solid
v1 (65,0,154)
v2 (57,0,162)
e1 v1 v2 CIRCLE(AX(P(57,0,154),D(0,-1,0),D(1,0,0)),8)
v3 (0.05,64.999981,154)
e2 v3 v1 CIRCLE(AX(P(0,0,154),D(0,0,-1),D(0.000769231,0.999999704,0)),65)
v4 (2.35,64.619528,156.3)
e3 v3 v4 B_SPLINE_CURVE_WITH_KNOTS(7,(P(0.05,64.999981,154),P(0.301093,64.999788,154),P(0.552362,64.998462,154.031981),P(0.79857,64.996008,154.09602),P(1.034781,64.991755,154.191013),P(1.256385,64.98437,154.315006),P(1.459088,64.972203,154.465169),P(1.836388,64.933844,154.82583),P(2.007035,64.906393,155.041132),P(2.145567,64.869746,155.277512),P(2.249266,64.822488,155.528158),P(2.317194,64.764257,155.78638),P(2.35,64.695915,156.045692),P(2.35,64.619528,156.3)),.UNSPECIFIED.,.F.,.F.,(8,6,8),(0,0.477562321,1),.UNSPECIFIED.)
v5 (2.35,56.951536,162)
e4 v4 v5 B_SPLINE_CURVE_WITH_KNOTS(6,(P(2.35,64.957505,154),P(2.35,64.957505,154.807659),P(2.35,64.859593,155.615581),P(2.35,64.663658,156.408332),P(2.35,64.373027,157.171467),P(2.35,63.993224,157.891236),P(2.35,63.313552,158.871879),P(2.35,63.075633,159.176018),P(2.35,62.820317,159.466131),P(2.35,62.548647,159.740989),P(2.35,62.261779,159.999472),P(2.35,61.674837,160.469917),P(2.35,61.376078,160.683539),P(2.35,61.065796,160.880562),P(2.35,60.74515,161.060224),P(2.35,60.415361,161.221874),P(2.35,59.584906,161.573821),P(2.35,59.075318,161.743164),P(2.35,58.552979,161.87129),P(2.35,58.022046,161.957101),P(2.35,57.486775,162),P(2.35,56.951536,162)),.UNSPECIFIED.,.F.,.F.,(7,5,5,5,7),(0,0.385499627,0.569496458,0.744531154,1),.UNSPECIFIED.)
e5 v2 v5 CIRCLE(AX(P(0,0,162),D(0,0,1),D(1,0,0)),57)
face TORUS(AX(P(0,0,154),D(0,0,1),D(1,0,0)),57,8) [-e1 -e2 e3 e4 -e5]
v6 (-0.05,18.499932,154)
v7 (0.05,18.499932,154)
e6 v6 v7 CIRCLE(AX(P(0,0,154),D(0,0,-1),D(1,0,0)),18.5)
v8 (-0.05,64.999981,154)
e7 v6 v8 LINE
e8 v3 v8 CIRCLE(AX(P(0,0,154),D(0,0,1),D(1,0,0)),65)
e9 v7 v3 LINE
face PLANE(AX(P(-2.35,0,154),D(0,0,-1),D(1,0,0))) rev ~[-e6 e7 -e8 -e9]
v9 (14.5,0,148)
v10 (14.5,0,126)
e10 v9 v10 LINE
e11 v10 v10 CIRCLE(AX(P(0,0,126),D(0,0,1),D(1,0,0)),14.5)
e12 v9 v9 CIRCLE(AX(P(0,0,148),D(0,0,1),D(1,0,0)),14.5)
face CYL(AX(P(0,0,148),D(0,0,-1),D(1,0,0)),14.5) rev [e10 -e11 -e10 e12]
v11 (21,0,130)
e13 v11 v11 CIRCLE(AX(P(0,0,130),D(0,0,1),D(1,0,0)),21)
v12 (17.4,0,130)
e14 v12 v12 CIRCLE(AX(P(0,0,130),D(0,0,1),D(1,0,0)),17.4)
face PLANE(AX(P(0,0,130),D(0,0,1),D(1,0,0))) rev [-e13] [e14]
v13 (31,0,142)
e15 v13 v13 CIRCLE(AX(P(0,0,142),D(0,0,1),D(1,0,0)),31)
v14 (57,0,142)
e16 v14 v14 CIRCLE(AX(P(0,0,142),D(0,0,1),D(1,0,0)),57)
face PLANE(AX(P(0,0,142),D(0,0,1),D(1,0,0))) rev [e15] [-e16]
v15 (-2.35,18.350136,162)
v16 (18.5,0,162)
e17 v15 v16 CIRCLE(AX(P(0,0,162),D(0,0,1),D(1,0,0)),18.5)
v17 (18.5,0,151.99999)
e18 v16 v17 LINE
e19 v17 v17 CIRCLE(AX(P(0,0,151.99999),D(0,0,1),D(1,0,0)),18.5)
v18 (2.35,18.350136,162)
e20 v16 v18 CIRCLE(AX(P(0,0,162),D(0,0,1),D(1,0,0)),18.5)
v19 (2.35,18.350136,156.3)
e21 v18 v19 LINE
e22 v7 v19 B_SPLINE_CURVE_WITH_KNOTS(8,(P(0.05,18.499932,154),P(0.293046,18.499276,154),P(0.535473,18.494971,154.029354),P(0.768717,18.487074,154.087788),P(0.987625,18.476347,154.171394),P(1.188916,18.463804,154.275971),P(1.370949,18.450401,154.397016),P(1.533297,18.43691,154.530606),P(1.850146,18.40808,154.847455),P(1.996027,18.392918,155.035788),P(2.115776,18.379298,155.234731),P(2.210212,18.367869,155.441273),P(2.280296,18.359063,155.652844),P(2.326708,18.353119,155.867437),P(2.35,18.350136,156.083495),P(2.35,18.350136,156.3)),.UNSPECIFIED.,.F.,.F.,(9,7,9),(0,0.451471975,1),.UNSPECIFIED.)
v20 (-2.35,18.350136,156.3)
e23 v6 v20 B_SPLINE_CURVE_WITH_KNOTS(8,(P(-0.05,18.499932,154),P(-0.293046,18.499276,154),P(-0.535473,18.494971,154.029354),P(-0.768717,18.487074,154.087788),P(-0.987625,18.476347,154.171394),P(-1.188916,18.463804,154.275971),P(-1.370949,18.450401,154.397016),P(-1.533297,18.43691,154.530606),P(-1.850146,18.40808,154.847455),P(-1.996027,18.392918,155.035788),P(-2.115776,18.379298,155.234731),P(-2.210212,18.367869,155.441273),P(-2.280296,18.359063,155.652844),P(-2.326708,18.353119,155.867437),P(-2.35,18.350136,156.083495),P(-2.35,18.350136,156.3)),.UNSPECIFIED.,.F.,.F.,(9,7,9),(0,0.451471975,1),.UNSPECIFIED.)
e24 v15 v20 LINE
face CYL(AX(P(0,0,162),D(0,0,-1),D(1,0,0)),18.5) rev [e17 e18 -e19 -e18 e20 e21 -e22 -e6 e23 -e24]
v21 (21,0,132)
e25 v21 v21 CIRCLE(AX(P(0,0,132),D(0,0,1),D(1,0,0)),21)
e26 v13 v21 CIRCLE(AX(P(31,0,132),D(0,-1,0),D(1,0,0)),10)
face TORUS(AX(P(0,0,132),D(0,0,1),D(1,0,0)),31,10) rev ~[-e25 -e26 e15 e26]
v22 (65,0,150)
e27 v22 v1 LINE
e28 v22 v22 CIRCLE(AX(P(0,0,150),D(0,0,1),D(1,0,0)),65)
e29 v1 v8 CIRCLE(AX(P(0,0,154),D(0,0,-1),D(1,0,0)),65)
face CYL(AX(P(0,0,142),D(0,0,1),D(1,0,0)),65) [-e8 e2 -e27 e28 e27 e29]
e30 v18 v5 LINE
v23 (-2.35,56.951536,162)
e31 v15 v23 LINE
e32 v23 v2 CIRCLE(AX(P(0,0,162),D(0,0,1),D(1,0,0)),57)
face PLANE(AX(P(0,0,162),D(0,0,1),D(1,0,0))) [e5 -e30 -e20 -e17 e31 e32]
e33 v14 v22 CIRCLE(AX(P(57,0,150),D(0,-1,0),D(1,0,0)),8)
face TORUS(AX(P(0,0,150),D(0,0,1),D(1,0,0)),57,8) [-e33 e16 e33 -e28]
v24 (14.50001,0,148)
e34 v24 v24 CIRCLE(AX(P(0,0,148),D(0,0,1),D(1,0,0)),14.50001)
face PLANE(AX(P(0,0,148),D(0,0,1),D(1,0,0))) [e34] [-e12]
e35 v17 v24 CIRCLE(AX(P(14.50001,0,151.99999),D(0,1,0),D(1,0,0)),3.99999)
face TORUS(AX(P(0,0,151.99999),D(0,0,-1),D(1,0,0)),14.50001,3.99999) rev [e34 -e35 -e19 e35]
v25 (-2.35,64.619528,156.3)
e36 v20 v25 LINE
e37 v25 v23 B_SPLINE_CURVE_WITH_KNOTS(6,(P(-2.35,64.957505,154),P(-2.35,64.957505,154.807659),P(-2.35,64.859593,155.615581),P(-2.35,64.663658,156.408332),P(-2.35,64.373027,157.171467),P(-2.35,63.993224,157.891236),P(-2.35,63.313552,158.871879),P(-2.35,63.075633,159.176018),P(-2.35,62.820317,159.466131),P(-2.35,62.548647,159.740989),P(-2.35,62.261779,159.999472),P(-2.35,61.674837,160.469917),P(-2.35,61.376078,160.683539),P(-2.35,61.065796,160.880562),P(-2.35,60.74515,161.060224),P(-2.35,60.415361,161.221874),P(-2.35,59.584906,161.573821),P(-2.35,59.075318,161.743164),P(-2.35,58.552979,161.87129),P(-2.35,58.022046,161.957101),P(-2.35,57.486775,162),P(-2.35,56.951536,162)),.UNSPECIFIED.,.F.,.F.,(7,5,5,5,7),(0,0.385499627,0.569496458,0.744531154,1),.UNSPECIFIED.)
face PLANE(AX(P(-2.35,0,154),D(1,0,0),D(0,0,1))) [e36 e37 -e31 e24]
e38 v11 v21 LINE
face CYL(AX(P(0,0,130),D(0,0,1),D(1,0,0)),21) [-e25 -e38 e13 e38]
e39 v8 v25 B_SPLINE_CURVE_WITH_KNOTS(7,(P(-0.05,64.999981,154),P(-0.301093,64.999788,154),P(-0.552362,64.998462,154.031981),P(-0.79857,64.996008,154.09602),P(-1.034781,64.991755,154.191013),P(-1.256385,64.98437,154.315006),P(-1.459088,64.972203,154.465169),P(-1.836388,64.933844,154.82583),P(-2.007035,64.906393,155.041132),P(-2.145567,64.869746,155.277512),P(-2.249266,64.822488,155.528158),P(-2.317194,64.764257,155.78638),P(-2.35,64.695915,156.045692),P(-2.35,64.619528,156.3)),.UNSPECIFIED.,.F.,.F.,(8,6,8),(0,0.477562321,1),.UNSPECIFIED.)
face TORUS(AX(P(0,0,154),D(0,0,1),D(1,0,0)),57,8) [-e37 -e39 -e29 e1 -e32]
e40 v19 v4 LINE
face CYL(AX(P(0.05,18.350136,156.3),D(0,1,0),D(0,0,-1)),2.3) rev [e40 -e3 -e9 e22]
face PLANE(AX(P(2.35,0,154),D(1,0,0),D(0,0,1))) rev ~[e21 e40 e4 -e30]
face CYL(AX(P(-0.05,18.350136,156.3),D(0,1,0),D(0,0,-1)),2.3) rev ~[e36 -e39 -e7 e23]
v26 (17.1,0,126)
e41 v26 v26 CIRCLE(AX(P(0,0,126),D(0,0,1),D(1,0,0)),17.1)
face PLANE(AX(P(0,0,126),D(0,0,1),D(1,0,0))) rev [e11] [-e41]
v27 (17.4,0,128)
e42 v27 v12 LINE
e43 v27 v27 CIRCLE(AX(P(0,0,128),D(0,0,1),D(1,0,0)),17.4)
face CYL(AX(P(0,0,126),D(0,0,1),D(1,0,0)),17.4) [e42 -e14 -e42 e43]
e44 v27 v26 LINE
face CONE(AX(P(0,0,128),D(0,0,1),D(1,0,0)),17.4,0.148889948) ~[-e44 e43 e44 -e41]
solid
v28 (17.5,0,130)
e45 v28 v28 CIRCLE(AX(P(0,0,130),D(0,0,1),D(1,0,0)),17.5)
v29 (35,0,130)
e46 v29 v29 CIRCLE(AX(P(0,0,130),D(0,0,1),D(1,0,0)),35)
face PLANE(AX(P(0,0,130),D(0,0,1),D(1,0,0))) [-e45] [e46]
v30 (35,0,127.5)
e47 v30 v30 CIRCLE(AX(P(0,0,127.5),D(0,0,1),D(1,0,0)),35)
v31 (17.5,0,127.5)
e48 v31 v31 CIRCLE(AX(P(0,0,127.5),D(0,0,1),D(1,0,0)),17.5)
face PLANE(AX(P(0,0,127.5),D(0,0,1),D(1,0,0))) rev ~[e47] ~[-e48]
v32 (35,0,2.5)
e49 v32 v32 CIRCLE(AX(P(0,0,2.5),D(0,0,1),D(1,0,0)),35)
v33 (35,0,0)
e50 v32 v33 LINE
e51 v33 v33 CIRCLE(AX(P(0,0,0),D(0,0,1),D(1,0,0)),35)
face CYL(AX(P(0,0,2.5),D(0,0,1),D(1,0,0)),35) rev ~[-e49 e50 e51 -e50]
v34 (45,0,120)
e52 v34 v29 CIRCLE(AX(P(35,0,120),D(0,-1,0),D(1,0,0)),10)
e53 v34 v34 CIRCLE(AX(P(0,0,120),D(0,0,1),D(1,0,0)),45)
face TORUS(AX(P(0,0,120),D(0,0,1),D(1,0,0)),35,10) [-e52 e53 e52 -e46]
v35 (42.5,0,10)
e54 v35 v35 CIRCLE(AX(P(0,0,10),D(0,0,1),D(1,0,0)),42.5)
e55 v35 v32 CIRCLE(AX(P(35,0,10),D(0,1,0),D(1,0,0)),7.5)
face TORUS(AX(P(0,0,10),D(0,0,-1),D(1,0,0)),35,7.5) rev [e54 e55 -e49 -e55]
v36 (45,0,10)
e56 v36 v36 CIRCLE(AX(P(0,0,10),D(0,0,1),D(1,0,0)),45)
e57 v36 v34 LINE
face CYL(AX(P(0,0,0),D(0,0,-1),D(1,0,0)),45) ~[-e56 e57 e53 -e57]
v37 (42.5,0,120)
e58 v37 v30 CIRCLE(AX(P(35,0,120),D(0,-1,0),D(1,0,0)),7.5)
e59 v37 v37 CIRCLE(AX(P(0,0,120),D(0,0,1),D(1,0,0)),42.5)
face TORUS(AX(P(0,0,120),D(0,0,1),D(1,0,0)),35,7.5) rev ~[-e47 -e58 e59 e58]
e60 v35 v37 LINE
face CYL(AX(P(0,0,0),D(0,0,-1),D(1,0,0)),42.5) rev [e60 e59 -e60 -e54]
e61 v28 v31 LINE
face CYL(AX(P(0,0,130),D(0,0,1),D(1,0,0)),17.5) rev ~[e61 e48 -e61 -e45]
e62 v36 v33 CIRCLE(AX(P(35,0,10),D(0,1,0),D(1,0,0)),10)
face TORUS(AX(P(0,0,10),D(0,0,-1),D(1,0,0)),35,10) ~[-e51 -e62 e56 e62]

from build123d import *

# Parameters (mm, degrees)
F0_R      = 45
F1_DEPTH  = 130
F2_R      = 10
F3_T      = -2.5
F4_R      = 17.5
F5_DEPTH  = 25
F9_R      = 8
F10_R     = 10
F12_W     = 4.7
F12_H     = 8
F13_DEPTH = 100
F14_R     = 2.3
F15_R     = 3.99999


# Not quite as in the source:
# - a fillet or chamfer that OpenCascade refuses, or shapes differently, is made with other operations: its cross-section is extruded or revolved along the edge and cut away or added
# - a fillet or chamfer is up to 0.001 mm smaller than in the source, because OpenCascade refuses the exact size
# - a feature names something its author has since deleted; it is built from what else it names


with BuildPart() as f1:
    # F0 (on Top) → F1 (new body)
    with BuildSketch(Plane.XY):
        Circle(F0_R)
    extrude(amount=F1_DEPTH)

    # F2
    f2_edges = [f1.edges().sort_by_distance(p)[0] for p in [
        (-45, 0, 0),
        (-45, 0, 130),
    ]]
    fillet(f2_edges, radius=F2_R)

    # F3: a shell. OpenCascade refuses it in one call, so the cavity is built on its own and cut out:
    # the body offset inwards by the wall thickness, plus a prism from it out through each open face.
    f3_core = offset(f1.part, amount=F3_T, mode=Mode.PRIVATE)
    f3_exits = [f3_core.faces().sort_by_distance(p)[0] for p in [
        (0, 0, 2.5),
    ]]
    add(f3_core, mode=Mode.SUBTRACT)
    extrude(f3_exits, amount=-F3_T, mode=Mode.SUBTRACT)

    # F4 (on face) → F5 (cut)
    with BuildSketch(Plane.XY.offset(130)):
        Circle(F4_R)
    extrude(amount=-F5_DEPTH, mode=Mode.SUBTRACT)


with BuildPart() as f8:
    # F7 (on Front) → F8 (revolve)
    with BuildSketch(Plane.XZ):
        Polygon((21, 142), (65, 142), (65, 162), (18.5, 162), (18.5, 148), (14.5, 148), (14.5, 126), (17.4, 126), (17.4, 130), (21, 130), align=None)
    revolve(axis=Axis((0, 0, 127.8810352087), (0, 0, 1)))

    # F9
    f9_edges = [f8.edges().sort_by_distance(p)[0] for p in [
        (-65, 0, 142),
        (-65, 0, 162),
    ]]
    fillet(f9_edges, radius=F9_R)

    # F10
    f10_edges = [f8.edges().sort_by_distance(p)[0] for p in [
        (-21, 0, 142),
    ]]
    fillet(f10_edges, radius=F10_R)

    # F11: chamfer of 0.3 x 2 on 1 edges, made by hand

    # F11_s1 → F11_t2 (revolve, cut)
    with BuildSketch(Plane.XZ):
        Polygon((17.4, 128), (17.1, 126), (17.4, 126), align=None)
    revolve(axis=Axis((0, 0, 126), (0, 0, 1)), mode=Mode.SUBTRACT)

    # F12 (on Front) → F13 (cut)
    with BuildSketch(Plane.XZ):
        with Locations((0, 158)):
            Rectangle(F12_W, F12_H)
    extrude(amount=-F13_DEPTH, mode=Mode.SUBTRACT)

    # F14
    f14_edges = [f8.edges().sort_by_distance(p)[0] for p in [
        (-2.35, 41.653821, 154),
        (2.35, 41.653821, 154),
    ]]
    fillet(f14_edges, radius=F14_R)

    # F15 (radius 4 in the source; OpenCascade refuses exactly that, so slightly less here)
    f15_edges = [f8.edges().sort_by_distance(p)[0] for p in [
        (-18.5, 0, 148),
    ]]
    fillet(f15_edges, radius=F15_R)


solid = Compound([f1.part, f8.part])
